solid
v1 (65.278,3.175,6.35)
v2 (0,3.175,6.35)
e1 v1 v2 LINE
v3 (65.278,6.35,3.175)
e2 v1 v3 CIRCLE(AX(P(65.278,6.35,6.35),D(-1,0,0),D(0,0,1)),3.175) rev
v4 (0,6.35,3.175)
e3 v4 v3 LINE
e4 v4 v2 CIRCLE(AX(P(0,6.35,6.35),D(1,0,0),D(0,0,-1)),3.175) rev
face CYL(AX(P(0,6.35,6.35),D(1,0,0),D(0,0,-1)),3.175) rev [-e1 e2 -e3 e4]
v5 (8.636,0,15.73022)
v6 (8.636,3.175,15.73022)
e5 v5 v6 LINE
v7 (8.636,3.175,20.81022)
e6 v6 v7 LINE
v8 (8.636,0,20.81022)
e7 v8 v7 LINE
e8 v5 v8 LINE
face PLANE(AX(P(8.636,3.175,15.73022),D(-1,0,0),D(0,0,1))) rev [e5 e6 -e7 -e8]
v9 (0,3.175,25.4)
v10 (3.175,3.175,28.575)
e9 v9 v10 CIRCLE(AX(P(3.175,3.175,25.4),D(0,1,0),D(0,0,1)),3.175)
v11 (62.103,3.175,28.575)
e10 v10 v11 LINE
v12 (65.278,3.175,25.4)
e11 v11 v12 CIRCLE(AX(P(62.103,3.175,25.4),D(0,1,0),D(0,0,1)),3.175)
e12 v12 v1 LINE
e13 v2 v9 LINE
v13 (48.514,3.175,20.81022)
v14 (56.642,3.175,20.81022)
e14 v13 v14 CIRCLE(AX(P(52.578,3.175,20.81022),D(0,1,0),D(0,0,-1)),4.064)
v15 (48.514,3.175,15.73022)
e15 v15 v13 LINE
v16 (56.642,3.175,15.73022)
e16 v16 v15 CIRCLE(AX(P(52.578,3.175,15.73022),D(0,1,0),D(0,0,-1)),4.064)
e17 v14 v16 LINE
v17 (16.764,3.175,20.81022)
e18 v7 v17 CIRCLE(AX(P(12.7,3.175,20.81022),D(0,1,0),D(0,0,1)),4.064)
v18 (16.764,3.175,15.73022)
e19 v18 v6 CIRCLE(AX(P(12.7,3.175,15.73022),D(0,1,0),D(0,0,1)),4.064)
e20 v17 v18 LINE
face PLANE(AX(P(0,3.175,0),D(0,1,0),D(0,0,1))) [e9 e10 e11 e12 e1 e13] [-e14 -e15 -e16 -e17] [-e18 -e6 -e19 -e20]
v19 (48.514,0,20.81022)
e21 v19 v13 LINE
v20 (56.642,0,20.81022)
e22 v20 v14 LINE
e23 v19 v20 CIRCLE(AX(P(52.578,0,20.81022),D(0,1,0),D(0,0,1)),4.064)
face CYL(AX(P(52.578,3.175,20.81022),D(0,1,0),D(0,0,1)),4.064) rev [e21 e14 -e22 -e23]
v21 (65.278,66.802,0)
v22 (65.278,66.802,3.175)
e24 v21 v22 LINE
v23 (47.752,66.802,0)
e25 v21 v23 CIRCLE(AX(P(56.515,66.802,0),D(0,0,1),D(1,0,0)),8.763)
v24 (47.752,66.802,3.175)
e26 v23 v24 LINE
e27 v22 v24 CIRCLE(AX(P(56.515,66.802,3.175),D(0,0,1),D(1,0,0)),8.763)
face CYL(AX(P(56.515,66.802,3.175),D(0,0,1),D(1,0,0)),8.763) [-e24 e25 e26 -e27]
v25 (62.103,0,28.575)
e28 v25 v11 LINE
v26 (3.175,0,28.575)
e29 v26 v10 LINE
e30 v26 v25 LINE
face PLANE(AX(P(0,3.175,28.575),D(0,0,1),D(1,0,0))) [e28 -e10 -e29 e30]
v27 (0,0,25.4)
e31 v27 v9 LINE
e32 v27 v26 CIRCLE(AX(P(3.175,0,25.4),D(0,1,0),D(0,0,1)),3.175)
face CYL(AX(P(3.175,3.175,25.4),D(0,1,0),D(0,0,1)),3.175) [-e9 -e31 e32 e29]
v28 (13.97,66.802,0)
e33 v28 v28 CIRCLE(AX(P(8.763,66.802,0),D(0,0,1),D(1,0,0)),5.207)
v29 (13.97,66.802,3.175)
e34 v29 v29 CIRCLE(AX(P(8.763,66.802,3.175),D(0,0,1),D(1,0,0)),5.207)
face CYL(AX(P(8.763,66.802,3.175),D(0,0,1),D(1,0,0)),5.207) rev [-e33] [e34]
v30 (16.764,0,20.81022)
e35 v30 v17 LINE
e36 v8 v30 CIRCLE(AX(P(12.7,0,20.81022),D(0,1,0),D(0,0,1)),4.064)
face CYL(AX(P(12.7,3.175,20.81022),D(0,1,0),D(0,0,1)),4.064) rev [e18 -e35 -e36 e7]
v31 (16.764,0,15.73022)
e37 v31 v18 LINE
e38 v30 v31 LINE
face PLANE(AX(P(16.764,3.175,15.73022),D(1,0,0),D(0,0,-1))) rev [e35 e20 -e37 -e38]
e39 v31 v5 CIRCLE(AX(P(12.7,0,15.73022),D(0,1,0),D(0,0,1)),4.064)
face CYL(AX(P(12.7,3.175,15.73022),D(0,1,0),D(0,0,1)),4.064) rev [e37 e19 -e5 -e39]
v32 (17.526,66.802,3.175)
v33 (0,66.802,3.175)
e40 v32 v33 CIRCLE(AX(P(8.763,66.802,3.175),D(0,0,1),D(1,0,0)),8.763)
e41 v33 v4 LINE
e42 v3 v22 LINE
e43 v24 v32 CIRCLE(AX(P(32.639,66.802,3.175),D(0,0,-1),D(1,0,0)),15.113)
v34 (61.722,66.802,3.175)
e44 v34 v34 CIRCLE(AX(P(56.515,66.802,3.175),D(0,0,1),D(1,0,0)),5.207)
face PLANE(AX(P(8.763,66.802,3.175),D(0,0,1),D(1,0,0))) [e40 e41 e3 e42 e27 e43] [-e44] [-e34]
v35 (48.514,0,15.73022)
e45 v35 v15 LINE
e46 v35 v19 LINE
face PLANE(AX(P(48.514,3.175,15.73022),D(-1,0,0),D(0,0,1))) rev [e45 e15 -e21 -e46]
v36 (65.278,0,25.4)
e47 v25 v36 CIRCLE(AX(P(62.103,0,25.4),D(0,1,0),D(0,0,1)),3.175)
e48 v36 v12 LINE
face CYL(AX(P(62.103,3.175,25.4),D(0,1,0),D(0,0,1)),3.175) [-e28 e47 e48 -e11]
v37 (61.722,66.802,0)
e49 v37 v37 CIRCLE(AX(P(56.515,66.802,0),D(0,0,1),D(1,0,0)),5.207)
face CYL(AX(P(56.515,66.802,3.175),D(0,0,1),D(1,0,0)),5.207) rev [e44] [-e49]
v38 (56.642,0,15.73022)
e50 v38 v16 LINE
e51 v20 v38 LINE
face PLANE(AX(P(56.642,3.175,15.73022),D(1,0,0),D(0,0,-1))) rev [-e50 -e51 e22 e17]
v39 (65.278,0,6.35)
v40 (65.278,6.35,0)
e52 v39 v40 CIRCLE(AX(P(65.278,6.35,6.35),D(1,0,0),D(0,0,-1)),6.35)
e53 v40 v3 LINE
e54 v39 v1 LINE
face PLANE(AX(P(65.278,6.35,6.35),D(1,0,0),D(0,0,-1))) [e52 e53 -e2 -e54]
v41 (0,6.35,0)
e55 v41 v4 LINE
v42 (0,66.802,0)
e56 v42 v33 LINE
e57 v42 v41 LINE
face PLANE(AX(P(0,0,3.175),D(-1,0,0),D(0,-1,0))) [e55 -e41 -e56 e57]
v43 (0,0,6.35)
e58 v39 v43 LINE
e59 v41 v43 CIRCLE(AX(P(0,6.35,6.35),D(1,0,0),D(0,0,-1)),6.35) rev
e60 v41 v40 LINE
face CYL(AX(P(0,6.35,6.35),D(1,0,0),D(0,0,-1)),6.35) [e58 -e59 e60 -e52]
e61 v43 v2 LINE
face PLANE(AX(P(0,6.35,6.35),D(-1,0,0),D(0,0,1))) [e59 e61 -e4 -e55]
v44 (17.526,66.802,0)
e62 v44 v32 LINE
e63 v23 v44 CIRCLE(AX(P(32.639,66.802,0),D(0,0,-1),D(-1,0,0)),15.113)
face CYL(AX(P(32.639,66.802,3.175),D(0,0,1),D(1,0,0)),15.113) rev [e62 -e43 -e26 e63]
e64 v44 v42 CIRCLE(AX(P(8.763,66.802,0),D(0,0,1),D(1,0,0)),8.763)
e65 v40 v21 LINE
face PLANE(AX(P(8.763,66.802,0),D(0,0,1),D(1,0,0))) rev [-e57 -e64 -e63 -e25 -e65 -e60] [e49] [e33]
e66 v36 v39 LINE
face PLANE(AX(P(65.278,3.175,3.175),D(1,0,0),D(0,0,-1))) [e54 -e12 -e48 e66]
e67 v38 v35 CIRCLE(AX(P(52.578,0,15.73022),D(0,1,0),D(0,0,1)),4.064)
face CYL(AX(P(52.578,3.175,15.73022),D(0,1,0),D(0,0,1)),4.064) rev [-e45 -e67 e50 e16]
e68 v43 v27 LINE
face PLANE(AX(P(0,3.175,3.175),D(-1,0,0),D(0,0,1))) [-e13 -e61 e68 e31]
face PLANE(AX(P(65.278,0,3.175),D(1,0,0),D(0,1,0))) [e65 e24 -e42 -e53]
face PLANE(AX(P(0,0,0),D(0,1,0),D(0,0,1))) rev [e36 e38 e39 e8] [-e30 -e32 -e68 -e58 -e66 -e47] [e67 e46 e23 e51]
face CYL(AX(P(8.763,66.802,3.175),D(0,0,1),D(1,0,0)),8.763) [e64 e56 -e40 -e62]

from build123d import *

# Parameters (mm, degrees)
SKETCH1_R              = 5.207
BOSS_EXTRUDE1_DEPTH    = 3.175
SKETCH2_W              = 65.278
SKETCH2_H              = 25.4
BOSS_EXTRUDE2_DEPTH    = 3.175
FILLET1_R              = 3.175
CONVERT_SOLID1_DEPTH   = 65.278
CONVERT_SOLID1_2_DEPTH = 65.278


# Read off the part's stored shape, not the designer's step: Convert-Solid1
with BuildPart() as part:
    # Sketch1 → Boss-Extrude1 (new body)
    with BuildSketch(Plane.XY):
        with BuildLine():
            Line((0, 0), (65.278, 0))
            Line((65.278, 0), (65.278, 66.802))
            ThreePointArc((65.278, 66.802), (56.515, 75.565), (47.752, 66.802))
            ThreePointArc((47.752, 66.802), (32.639, 51.689), (17.526, 66.802))
            ThreePointArc((17.526, 66.802), (8.763, 75.565), (0, 66.802))
            Line((0, 66.802), (0, 0))
        make_face()
        with Locations((8.763, 66.802)):
            Circle(SKETCH1_R, mode=Mode.SUBTRACT)
        with Locations((56.515, 66.802)):
            Circle(SKETCH1_R, mode=Mode.SUBTRACT)
    extrude(amount=BOSS_EXTRUDE1_DEPTH)

    # Sketch2 → Boss-Extrude2 (add)
    with BuildSketch(Plane(origin=(0, 0, 0), x_dir=(1, 0, 0), z_dir=(0, 1, 0))):
        with Locations((32.639, -15.875)):
            Rectangle(SKETCH2_W, SKETCH2_H)
        with BuildLine():
            Line((16.764, -15.73022), (16.764, -20.81022))
            ThreePointArc((16.764, -20.81022), (12.7, -24.87422), (8.636, -20.81022))
            Line((8.636, -20.81022), (8.636, -15.73022))
            ThreePointArc((8.636, -15.73022), (12.7, -11.66622), (16.764, -15.73022))
        make_face(mode=Mode.SUBTRACT)
        with BuildLine():
            Line((48.514, -15.73022), (48.514, -20.81022))
            ThreePointArc((48.514, -20.81022), (52.578, -24.87422), (56.642, -20.81022))
            Line((56.642, -20.81022), (56.642, -15.73022))
            ThreePointArc((56.642, -15.73022), (52.578, -11.66622), (48.514, -15.73022))
        make_face(mode=Mode.SUBTRACT)
    extrude(amount=BOSS_EXTRUDE2_DEPTH)

    # Fillet1
    fillet1_edges = [part.edges().sort_by_distance(p)[0] for p in [
        (0, 1.5875, 28.575),
        (65.278, 1.5875, 28.575),
    ]]
    fillet(fillet1_edges, radius=FILLET1_R)

    # Convert-Solid1 outline → Convert-Solid1 (cut)
    with BuildSketch(Plane.YZ):
        with BuildLine():
            ThreePointArc((6.35, 0), (1.859871939, 1.859871939), (0, 6.35))
            Line((0, 6.35), (0, 0))
            Line((0, 0), (6.35, 0))
        make_face()
    extrude(amount=CONVERT_SOLID1_DEPTH, mode=Mode.SUBTRACT)

    # Convert-Solid1 2 outline → Convert-Solid1 2 (add)
    with BuildSketch(Plane.YZ):
        with BuildLine():
            ThreePointArc((6.35, 3.175), (4.10493597, 4.10493597), (3.175, 6.35))
            Line((3.175, 6.35), (3.175, 3.175))
            Line((3.175, 3.175), (6.35, 3.175))
        make_face()
    extrude(amount=CONVERT_SOLID1_2_DEPTH)


solid = part.part
